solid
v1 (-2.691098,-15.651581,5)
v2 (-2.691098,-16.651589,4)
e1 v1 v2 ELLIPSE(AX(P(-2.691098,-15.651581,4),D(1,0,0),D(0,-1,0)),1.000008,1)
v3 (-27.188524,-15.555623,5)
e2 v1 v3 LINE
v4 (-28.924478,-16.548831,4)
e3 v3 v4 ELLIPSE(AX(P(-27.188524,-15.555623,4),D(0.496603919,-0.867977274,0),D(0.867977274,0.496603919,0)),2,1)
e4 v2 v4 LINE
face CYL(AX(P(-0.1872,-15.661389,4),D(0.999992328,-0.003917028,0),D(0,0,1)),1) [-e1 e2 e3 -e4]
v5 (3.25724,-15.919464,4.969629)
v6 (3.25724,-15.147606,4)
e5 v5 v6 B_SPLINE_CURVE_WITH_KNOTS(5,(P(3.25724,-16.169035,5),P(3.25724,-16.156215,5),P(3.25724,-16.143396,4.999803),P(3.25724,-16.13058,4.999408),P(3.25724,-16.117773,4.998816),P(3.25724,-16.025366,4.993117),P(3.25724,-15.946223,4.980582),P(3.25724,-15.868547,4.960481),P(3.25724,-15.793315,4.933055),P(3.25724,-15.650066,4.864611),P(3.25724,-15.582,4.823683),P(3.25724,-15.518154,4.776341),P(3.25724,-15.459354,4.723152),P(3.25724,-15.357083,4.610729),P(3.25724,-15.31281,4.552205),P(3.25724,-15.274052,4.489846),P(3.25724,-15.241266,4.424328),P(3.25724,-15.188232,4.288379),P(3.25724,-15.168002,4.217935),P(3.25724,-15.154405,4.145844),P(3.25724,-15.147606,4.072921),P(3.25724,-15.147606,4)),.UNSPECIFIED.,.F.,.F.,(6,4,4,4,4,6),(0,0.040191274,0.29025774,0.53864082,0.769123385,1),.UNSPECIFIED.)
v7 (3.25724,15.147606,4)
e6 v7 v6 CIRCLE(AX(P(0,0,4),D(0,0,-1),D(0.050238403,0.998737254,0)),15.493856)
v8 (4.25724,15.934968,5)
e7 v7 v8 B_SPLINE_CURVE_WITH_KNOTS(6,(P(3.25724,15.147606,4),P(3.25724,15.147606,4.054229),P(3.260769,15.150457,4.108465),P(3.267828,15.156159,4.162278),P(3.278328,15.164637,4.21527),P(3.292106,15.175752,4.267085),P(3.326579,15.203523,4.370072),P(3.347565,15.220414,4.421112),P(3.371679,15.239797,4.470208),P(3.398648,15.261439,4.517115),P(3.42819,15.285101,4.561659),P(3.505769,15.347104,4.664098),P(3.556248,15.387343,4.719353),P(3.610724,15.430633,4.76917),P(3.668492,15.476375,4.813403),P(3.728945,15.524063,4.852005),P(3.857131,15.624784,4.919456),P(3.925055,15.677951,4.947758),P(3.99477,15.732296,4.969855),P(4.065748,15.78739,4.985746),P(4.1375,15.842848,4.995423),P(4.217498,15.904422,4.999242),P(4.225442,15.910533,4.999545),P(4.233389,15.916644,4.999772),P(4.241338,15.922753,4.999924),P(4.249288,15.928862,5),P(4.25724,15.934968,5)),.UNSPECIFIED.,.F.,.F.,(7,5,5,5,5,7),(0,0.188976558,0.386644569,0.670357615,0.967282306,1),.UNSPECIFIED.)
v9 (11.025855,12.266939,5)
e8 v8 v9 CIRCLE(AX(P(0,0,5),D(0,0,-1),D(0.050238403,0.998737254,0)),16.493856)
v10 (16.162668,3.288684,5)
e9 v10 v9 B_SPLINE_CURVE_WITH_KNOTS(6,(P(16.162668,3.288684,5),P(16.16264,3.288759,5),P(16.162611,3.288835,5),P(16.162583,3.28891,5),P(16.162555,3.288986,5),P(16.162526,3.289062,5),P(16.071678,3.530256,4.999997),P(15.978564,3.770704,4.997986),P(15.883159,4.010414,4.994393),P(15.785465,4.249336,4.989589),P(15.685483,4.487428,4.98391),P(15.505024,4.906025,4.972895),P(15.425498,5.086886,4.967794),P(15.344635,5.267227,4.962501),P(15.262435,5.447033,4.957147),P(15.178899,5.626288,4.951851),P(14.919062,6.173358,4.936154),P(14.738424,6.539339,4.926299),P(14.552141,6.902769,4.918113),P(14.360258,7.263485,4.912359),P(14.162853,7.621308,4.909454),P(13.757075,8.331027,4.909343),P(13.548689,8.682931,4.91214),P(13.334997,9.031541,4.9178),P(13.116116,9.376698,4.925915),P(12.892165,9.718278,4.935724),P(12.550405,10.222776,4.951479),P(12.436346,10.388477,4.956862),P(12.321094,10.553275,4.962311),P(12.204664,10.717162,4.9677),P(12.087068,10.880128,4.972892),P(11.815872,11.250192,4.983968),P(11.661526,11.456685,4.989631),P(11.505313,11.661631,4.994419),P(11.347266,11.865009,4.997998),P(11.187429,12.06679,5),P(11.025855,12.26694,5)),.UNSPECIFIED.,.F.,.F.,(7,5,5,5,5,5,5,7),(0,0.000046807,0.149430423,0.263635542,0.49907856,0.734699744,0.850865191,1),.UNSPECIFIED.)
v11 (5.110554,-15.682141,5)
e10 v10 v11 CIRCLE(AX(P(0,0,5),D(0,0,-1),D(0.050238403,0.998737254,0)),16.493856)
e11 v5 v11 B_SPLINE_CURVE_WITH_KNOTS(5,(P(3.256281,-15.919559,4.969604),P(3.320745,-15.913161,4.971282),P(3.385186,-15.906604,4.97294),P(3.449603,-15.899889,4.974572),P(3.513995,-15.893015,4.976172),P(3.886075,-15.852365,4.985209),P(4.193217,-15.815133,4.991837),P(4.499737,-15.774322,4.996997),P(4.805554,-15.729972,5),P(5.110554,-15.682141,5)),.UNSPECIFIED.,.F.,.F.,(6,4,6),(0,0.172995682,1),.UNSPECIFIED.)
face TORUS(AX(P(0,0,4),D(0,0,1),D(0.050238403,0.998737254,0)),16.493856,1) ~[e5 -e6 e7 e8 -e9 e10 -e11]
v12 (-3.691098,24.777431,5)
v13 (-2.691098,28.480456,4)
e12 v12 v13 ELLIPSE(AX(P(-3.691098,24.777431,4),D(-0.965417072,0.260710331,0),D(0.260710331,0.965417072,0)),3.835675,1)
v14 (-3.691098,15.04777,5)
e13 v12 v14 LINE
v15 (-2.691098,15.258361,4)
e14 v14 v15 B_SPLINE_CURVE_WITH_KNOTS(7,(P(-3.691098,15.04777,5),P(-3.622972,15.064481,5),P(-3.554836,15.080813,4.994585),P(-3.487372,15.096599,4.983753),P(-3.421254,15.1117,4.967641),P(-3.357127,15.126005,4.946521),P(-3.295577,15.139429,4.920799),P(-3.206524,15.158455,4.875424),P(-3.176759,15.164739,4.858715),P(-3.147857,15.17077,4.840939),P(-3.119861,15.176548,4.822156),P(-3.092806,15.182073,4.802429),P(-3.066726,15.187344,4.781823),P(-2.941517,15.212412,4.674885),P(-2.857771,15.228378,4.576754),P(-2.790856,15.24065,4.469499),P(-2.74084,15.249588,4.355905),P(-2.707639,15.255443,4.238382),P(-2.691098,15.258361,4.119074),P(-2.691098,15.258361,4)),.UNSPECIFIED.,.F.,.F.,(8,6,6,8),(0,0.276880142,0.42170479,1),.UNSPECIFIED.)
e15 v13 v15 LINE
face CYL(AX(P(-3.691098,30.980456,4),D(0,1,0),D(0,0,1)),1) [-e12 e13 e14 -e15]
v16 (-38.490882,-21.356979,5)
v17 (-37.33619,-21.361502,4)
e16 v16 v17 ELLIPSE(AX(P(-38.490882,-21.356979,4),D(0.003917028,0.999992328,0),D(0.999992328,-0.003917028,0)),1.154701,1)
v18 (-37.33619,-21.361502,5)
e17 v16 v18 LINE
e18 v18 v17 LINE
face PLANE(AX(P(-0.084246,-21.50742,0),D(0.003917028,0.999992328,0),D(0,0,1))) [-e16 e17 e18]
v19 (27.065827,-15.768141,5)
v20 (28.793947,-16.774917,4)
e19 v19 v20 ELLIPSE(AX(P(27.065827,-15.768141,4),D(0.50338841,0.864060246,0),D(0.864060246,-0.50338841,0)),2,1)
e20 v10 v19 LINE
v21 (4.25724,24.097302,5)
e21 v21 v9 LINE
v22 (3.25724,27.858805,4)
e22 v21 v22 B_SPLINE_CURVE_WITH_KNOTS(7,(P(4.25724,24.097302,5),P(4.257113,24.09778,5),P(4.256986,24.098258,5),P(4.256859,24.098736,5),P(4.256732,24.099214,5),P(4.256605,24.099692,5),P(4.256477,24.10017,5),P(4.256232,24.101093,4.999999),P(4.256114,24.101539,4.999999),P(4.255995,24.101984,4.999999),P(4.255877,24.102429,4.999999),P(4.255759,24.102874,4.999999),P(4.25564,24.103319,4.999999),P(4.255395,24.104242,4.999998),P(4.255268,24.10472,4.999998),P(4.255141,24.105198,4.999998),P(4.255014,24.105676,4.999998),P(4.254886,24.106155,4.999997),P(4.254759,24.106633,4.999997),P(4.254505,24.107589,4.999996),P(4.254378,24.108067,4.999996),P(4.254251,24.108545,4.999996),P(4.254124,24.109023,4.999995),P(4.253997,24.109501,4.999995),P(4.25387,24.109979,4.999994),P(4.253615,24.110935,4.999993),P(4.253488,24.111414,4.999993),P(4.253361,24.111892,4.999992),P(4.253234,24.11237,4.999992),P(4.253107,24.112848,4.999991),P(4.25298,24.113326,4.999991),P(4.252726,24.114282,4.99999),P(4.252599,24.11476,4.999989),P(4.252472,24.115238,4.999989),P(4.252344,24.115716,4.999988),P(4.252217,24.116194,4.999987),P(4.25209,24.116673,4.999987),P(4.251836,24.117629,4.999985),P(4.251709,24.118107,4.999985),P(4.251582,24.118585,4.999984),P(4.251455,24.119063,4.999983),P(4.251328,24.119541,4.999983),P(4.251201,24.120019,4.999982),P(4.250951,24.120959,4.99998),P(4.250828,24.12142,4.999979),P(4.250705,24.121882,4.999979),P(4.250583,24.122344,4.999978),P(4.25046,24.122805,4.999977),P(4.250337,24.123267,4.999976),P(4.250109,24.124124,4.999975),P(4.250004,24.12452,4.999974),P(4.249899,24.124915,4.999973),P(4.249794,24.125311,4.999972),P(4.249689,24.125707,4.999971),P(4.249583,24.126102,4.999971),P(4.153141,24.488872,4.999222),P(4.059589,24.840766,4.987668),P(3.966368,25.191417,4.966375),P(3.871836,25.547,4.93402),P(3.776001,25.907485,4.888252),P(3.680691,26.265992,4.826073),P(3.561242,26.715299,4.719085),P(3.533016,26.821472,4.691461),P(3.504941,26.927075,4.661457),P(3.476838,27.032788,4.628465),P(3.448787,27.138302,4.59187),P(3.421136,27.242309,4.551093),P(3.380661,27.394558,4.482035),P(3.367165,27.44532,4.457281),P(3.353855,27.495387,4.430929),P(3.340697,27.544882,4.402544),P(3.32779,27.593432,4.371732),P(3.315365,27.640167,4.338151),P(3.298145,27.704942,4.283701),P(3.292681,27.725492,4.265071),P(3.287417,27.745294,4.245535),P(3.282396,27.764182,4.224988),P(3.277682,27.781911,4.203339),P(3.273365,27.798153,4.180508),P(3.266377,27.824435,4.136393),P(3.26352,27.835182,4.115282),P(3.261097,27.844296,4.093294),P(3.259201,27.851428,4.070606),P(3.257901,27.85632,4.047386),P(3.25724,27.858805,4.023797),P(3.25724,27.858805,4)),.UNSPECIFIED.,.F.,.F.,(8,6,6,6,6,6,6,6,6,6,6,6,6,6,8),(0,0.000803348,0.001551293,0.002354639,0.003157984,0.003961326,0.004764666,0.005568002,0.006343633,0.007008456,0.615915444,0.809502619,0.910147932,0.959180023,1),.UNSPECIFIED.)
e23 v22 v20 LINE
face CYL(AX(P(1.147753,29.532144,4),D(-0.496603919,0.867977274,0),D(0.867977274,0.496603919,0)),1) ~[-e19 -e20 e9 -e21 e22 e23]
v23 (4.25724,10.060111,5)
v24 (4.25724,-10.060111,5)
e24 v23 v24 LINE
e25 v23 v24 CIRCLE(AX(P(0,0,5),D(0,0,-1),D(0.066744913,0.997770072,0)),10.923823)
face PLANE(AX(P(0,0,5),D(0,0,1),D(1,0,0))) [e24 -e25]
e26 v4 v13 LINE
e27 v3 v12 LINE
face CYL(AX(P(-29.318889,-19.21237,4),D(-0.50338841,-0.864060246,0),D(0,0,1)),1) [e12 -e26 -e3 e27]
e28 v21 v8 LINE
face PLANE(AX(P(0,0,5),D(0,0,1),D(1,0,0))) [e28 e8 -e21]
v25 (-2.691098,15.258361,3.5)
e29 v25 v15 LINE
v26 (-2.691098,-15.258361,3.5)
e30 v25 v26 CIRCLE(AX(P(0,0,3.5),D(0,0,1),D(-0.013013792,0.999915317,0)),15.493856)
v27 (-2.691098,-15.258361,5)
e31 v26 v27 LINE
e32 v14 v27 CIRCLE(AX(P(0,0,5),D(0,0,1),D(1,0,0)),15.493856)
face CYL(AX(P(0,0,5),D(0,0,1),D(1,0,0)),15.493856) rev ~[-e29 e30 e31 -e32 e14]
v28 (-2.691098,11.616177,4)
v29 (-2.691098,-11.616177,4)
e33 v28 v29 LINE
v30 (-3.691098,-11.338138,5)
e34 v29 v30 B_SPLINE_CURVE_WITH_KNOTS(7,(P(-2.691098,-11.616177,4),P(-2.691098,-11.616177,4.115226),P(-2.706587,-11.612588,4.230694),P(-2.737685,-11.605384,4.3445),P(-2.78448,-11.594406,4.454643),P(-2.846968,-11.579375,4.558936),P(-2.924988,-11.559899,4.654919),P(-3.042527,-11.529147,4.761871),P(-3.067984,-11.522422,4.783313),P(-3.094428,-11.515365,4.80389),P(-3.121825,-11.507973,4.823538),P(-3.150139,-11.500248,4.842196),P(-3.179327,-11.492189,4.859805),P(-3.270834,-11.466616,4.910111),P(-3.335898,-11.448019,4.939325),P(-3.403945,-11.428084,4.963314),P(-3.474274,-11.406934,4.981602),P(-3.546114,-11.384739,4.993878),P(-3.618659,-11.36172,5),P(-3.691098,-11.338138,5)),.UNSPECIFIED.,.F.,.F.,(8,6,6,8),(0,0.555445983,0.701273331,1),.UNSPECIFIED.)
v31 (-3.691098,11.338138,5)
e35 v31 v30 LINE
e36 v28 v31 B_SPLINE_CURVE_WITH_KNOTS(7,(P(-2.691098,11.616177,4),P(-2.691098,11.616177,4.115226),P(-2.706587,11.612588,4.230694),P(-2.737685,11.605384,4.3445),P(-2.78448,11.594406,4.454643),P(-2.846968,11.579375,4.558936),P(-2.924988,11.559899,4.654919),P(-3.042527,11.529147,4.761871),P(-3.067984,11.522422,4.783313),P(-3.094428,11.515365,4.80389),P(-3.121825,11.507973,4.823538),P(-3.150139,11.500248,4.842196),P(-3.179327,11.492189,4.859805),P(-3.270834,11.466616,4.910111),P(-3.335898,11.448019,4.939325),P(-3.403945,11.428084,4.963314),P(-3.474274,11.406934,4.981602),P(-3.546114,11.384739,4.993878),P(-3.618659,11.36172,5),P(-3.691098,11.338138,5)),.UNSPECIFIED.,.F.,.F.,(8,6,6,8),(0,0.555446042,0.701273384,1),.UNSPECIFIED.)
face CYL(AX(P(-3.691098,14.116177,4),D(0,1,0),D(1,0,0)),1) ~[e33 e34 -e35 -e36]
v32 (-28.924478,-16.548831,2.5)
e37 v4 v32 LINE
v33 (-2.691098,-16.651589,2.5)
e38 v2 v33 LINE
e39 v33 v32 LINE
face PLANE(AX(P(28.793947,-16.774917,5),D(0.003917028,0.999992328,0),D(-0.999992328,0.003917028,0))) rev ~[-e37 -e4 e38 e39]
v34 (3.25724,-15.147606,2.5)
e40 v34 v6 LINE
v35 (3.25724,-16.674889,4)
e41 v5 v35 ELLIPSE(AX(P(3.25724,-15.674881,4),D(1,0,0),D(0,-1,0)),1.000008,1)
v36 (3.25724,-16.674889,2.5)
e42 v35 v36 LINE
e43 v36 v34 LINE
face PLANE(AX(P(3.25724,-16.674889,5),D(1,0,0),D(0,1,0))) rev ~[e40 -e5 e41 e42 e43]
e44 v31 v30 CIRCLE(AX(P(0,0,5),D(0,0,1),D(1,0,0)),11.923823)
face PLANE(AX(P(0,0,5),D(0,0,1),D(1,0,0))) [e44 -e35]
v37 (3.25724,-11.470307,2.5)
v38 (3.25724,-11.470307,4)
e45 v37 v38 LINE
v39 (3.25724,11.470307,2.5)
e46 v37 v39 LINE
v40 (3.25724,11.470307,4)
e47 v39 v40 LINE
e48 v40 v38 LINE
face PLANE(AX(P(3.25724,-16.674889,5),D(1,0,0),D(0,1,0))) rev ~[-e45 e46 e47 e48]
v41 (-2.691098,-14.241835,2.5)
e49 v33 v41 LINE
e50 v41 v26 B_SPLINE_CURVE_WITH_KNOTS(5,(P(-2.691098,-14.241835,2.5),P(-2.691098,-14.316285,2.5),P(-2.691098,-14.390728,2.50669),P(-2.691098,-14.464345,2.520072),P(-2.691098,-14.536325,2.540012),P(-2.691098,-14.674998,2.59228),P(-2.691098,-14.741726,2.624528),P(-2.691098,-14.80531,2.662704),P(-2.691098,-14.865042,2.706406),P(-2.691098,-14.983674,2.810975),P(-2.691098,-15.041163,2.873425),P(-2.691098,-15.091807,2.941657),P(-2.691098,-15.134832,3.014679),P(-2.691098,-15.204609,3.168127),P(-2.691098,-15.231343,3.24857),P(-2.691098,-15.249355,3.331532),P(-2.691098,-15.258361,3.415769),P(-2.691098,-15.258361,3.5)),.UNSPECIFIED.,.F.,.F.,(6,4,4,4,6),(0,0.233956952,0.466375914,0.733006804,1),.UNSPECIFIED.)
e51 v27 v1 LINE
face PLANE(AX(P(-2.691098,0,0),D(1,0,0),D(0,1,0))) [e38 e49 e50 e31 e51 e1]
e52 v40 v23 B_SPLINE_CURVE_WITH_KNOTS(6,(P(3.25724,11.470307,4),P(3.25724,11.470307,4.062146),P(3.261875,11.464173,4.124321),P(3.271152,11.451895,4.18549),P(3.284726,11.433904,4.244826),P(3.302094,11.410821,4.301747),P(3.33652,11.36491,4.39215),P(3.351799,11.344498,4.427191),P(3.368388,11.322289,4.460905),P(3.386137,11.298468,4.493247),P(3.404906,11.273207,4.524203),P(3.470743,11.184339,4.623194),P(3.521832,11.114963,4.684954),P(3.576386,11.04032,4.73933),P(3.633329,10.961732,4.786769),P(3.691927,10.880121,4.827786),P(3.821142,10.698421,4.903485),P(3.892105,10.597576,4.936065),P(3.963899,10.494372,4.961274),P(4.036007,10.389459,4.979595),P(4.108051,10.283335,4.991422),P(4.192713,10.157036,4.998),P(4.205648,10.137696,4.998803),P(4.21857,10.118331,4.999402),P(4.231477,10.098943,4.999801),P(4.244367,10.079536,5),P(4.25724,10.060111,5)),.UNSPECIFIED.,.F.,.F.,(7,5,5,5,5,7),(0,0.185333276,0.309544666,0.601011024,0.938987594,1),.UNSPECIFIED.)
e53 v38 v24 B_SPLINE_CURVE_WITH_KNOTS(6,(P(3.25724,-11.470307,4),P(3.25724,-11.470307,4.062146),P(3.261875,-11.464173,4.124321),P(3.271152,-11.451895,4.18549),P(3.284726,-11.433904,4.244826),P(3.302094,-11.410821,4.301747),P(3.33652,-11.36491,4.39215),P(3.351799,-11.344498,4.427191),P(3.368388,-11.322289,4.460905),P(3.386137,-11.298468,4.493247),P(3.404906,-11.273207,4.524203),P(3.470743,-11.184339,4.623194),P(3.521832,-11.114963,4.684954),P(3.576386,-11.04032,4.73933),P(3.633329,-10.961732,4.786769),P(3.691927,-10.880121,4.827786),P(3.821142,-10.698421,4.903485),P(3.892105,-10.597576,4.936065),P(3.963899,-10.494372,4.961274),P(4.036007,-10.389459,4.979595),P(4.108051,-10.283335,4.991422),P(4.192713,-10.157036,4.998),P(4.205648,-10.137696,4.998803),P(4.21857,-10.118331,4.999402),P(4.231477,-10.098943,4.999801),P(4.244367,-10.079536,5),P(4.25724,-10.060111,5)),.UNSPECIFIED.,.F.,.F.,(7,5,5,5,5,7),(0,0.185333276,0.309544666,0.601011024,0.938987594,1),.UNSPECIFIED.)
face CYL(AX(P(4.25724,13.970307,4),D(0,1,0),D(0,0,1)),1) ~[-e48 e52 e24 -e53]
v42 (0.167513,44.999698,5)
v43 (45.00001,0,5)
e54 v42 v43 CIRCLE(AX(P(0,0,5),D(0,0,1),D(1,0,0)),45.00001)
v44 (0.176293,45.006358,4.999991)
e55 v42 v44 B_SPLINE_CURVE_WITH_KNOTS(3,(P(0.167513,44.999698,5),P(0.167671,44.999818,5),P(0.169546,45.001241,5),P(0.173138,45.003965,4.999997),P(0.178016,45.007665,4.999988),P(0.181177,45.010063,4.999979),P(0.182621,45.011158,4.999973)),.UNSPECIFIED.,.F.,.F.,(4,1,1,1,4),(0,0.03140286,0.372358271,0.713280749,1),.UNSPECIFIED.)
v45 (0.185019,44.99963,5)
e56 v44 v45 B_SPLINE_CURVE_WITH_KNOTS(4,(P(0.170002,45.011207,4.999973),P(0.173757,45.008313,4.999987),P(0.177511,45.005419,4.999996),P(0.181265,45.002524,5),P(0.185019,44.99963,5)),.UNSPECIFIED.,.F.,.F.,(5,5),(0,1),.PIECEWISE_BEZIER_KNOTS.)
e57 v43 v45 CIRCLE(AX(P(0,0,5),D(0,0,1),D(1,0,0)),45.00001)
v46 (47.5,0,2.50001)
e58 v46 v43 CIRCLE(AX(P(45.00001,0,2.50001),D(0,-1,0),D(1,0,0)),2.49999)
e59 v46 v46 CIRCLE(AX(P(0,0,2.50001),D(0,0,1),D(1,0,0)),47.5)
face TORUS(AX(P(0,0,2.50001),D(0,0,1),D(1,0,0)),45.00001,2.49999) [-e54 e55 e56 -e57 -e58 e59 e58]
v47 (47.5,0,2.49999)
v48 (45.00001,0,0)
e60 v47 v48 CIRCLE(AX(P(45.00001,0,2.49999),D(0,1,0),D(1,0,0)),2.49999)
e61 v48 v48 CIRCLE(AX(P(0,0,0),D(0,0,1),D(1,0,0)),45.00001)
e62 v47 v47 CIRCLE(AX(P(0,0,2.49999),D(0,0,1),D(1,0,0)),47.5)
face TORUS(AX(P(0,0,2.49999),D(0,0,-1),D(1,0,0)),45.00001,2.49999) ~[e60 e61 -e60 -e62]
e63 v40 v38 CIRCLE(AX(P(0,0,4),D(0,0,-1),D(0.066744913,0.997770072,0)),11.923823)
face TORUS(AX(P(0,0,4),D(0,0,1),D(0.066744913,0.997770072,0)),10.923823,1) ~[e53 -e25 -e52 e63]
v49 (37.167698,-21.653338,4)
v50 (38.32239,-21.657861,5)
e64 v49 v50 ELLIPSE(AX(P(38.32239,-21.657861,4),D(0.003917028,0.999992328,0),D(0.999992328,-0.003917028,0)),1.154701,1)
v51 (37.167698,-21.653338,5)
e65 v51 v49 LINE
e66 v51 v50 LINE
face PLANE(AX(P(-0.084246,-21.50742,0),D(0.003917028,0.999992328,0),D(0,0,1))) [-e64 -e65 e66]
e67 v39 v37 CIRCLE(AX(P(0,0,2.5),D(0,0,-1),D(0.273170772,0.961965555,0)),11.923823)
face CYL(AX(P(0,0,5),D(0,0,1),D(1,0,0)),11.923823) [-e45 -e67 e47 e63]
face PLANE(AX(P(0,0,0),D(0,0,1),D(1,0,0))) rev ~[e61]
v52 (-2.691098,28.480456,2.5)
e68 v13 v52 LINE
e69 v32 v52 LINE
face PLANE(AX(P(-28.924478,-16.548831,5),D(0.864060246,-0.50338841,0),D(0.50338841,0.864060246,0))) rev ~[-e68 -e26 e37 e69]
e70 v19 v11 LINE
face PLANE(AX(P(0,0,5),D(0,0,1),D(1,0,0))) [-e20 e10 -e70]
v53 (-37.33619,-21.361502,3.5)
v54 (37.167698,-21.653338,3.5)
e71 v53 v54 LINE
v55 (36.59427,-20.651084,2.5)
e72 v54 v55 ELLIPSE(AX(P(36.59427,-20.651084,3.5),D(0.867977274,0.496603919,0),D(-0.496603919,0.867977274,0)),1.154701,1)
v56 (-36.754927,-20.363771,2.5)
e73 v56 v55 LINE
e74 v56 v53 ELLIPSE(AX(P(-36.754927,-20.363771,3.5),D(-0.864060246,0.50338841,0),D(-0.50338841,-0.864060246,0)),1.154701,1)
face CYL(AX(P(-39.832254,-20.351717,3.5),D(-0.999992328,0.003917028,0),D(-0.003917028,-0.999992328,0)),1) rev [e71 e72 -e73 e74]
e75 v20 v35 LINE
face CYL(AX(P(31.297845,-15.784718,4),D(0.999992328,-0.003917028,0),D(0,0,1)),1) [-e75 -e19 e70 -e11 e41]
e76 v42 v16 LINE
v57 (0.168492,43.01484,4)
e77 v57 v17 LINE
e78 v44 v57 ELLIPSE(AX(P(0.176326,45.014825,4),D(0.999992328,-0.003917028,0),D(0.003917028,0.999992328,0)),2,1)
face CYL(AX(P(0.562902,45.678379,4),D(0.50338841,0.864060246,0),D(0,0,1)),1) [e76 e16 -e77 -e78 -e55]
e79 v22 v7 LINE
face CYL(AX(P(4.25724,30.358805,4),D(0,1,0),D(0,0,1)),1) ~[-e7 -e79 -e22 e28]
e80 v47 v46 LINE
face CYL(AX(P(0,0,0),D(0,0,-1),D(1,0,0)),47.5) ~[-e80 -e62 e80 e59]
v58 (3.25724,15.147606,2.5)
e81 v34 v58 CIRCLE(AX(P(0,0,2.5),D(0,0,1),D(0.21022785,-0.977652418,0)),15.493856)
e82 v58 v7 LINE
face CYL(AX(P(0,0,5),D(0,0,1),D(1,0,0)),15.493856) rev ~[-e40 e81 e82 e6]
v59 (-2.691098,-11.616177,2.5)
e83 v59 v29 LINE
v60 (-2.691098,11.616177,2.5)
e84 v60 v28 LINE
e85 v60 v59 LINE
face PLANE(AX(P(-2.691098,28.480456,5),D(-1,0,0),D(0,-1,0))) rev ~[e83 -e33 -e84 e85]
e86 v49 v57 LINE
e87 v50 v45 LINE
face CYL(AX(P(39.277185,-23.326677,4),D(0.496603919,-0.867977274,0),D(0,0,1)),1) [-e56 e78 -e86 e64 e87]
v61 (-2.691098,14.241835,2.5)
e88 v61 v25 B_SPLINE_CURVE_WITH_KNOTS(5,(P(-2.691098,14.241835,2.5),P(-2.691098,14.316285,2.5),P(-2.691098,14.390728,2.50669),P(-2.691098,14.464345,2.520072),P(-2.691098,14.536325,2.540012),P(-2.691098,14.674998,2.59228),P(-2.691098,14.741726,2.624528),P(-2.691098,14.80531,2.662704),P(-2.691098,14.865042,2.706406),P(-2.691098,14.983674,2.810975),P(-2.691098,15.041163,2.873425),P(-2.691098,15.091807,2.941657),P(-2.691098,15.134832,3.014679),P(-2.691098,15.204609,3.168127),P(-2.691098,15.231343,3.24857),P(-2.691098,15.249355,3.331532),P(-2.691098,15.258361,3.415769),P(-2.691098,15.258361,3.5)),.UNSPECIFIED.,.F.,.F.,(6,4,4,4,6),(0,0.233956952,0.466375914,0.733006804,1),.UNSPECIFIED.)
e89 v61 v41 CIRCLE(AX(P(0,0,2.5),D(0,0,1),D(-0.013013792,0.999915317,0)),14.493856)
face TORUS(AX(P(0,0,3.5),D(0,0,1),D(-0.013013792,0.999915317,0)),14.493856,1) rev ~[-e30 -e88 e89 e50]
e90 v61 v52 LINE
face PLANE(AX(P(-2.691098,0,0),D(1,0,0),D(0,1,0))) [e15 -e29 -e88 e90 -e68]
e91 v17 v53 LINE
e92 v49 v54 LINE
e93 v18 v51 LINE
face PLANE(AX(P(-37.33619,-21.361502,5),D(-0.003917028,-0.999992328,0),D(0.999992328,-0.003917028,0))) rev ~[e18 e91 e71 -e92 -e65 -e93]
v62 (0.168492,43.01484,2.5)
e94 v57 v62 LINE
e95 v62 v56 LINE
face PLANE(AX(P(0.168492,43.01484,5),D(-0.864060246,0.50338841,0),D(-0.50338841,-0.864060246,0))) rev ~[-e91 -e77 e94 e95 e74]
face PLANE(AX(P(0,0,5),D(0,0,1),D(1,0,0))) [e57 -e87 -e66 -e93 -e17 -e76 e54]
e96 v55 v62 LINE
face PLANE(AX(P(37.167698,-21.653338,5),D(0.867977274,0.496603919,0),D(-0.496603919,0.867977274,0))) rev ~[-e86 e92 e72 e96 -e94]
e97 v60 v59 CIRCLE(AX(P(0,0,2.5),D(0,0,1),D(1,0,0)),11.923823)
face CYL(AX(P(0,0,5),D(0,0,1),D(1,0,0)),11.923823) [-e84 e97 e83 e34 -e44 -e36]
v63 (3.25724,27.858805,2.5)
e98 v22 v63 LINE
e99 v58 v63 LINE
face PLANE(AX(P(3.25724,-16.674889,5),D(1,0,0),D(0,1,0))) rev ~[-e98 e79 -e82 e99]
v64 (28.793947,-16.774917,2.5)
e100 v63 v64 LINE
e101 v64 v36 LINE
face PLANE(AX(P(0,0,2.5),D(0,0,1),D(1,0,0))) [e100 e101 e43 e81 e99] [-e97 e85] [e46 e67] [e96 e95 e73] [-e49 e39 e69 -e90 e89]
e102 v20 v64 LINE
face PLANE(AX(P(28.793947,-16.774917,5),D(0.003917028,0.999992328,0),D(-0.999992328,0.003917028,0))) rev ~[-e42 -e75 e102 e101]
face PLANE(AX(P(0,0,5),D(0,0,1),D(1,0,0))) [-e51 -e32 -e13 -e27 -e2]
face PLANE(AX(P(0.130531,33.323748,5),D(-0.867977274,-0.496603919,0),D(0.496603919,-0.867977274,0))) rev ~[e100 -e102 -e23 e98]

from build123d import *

# Parameters (mm, degrees)
F0_R         = 47.5
F1_DEPTH     = 5
F3_DEPTH     = 2.5
F4_R         = 15.4938561144
F4_R_2       = 11.9238234347
F5_DEPTH     = 2.5
F7_DEPTH     = 2.5
F8_R         = 2.49999
F9_T1_DEPTH  = 79.5044599257
F9_T6_ANGLE  = 178.5086872517
F9_T8_DEPTH  = 27.9406148573
F9_T10_DEPTH = 28.2323532374
F9_T12_DEPTH = 17.7111990238
F9_T14_DEPTH = 18.2220956401
F9_T16_DEPTH = 31.2335819135
F9_T18_DEPTH = 30.5369030224
F9_T20_DEPTH = 56.4226854656
F9_T22_DEPTH = 57.113596888
F9_T25_ANGLE = 172.3459061433
F9_T27_ANGLE = 174.2406786555
F9_T31_DEPTH = 79.5044599257
F9_T37_DEPTH = 79.5044599257
F9_T44_DEPTH = 79.5044599257
F9_T48_DEPTH = 79.5044599257


# Not quite as in the source:
# - a fillet or chamfer that OpenCascade refuses, or shapes differently, is made with other operations: its cross-section is extruded or revolved along the edge and cut away or added
# - a fillet or chamfer is up to 0.001 mm smaller than in the source, because OpenCascade refuses the exact size


with BuildPart() as f1:
    # F0 (on Top) → F1 (new body)
    with BuildSketch(Plane.XY):
        Circle(F0_R)
    extrude(amount=F1_DEPTH)

    # F2 (on face) → F3 (cut)
    with BuildSketch(Plane.XY.offset(5)):
        Polygon((-37.336189985, -21.3615019839), (37.1676983736, -21.6533380156), (0.1684916114, 43.0148399995), align=None)
        Polygon((-28.924478218, -16.5488310158), (0.1305310463, 33.3237484359), (28.7939471716, -16.77491742), align=None, mode=Mode.SUBTRACT)
    extrude(amount=-F3_DEPTH, mode=Mode.SUBTRACT)

    # F4 (on face) → F5 (cut)
    with BuildSketch(Plane.XY.offset(5)):
        Circle(F4_R)
        Circle(F4_R_2, mode=Mode.SUBTRACT)
    extrude(amount=-F5_DEPTH, mode=Mode.SUBTRACT)

    # F6 (on face) → F7 (cut)
    with BuildSketch(Plane.XY.offset(5)):
        with BuildLine():
            Line((3.2572400577, 27.8588049238), (0.1305310463, 33.3237484359))
            Line((0.1305310463, 33.3237484359), (-2.6910975575, 28.4804563395))
            Line((-2.6910975575, 28.4804563395), (-2.6910975575, 15.2583606993))
            ThreePointArc((-2.6910975575, 15.2583606993), (0.2884371491, 15.491171076), (3.2572400577, 15.1476059))
            Line((3.2572400577, 15.1476059), (3.2572400577, 27.8588049238))
        make_face()
        with BuildLine():
            ThreePointArc((3.2572400577, 15.1476059), (0.2884371491, 15.491171076), (-2.6910975575, 15.2583606993))
            Line((-2.6910975575, 15.2583606993), (-2.6910975575, -15.2583606993))
            ThreePointArc((-2.6910975575, -15.2583606993), (0.2884371491, -15.491171076), (3.2572400577, -15.1476059))
            Line((3.2572400577, -15.1476059), (3.2572400577, 15.1476059))
        make_face()
        with BuildLine():
            ThreePointArc((3.2572400577, -15.1476059), (0.2884371491, -15.491171076), (-2.6910975575, -15.2583606993))
            Line((-2.6910975575, -15.2583606993), (-2.6910975575, -16.6515886823))
            Line((-2.6910975575, -16.6515886823), (3.2572400577, -16.6748886641))
            Line((3.2572400577, -16.6748886641), (3.2572400577, -15.1476059))
        make_face()
    extrude(amount=-F7_DEPTH, mode=Mode.SUBTRACT)

    # F8 (radius 2.5 in the source; OpenCascade refuses exactly that, so slightly less here)
    f8_edges = [f1.edges().sort_by_distance(p)[0] for p in [
        (-47.5, 0, 5),
        (-47.5, 0, 0),
    ]]
    fillet(f8_edges, radius=F8_R)

    # F9: fillet of radius 1 on 14 edges, made by hand

    # F9_s2 → F9_t1 (join)
    with BuildSketch(Plane(origin=(-39.7519250003, 0.155710585, 0), x_dir=(0, 0, 1), z_dir=(0.9999923284, -0.0039170277, 0))):
        with BuildLine():
            ThreePointArc((3.5, 21.507584997), (2.7928932188, 21.2146917781), (2.5, 20.507584997))
            Line((2.5, 20.507584997), (2.5, 21.507584997))
            Line((2.5, 21.507584997), (3.5, 21.507584997))
        make_face()
    extrude(amount=F9_T1_DEPTH)


with BuildPart() as f9_tool4:
    # F9_s5 → F9_t6 (revolve)
    with BuildSketch(Plane(origin=(0, 0, 0), x_dir=(0, 0, 1), z_dir=(0.999915317, 0.0130137915, 0))):
        with BuildLine():
            ThreePointArc((2.5, -14.4938561144), (2.7928932188, -15.2009628956), (3.5, -15.4938561144))
            Line((3.5, -15.4938561144), (2.5, -15.4938561144))
            Line((2.5, -15.4938561144), (2.5, -14.4938561144))
        make_face()
    revolve(axis=Axis((0, 0, 2.5), (0, 0, 1)), revolution_arc=F9_T6_ANGLE)

    split(bisect_by=Plane.YZ.offset(-2.6910975575), keep=Keep.BOTTOM)


with BuildPart() as f1_1:
    add(f1.part)

    # F9_t3: union F9_tool4
    add(f9_tool4.part)

    # F9_s9 → F9_t8 (cut)
    with BuildSketch(Plane.XZ.offset(-13.9703074287)):
        with BuildLine():
            ThreePointArc((4.2572400577, 5), (3.5501332765, 4.7071067812), (3.2572400577, 4))
            Line((3.2572400577, 4), (3.2572400577, 5))
            Line((3.2572400577, 5), (4.2572400577, 5))
        make_face()
    extrude(amount=F9_T8_DEPTH, mode=Mode.SUBTRACT)

    # F9_s11 → F9_t10 (cut)
    with BuildSketch(Plane.XZ.offset(-14.1161766187)):
        with BuildLine():
            ThreePointArc((-2.6910975575, 4), (-2.9839907764, 4.7071067812), (-3.6910975575, 5))
            Line((-3.6910975575, 5), (-2.6910975575, 5))
            Line((-2.6910975575, 5), (-2.6910975575, 4))
        make_face()
    extrude(amount=F9_T10_DEPTH, mode=Mode.SUBTRACT)

    # F9_s13 → F9_t12 (cut)
    with BuildSketch(Plane.XZ.offset(-30.3588049238)):
        with BuildLine():
            ThreePointArc((4.2572400577, 5), (3.5501332765, 4.7071067812), (3.2572400577, 4))
            Line((3.2572400577, 4), (3.2572400577, 5))
            Line((3.2572400577, 5), (4.2572400577, 5))
        make_face()
    extrude(amount=F9_T12_DEPTH, mode=Mode.SUBTRACT)

    # F9_s15 → F9_t14 (cut)
    with BuildSketch(Plane.XZ.offset(-30.9804563395)):
        with BuildLine():
            ThreePointArc((-3.6910975575, 5), (-2.9839907764, 4.7071067812), (-2.6910975575, 4))
            Line((-2.6910975575, 4), (-2.6910975575, 5))
            Line((-2.6910975575, 5), (-3.6910975575, 5))
        make_face()
    extrude(amount=F9_T14_DEPTH, mode=Mode.SUBTRACT)

    # F9_s17 → F9_t16 (cut)
    with BuildSketch(Plane(origin=(-0.1258512133, 0.0004929665, 0), x_dir=(0, 0, 1), z_dir=(-0.9999923284, 0.0039170277, 0))):
        with BuildLine():
            ThreePointArc((5, -15.6620020419), (4.7071067812, -16.369108823), (4, -16.6620020419))
            Line((4, -16.6620020419), (5, -16.6620020419))
            Line((5, -16.6620020419), (5, -15.6620020419))
        make_face()
    extrude(amount=F9_T16_DEPTH, mode=Mode.SUBTRACT)

    # F9_s19 → F9_t18 (cut)
    with BuildSketch(Plane(origin=(31.3591935158, -0.1228357713, 0), x_dir=(0, 0, 1), z_dir=(-0.9999923284, 0.0039170277, 0))):
        with BuildLine():
            ThreePointArc((5, -15.6620020419), (4.7071067812, -16.369108823), (4, -16.6620020419))
            Line((4, -16.6620020419), (5, -16.6620020419))
            Line((5, -16.6620020419), (5, -15.6620020419))
        make_face()
    extrude(amount=F9_T18_DEPTH, mode=Mode.SUBTRACT)

    # F9_s21 → F9_t20 (cut)
    with BuildSketch(Plane(origin=(-12.4465088481, 21.7543326005, 0), x_dir=(0, 0, 1), z_dir=(0.4966039187, -0.8679772738, 0))):
        with BuildLine():
            ThreePointArc((4, -16.6620020419), (4.7071067812, -16.369108823), (5, -15.6620020419))
            Line((5, -15.6620020419), (5, -16.6620020419))
            Line((5, -16.6620020419), (4, -16.6620020419))
        make_face()
    extrude(amount=F9_T20_DEPTH, mode=Mode.SUBTRACT)

    # F9_s23 → F9_t22 (cut)
    with BuildSketch(Plane(origin=(-15.7859756564, -27.0964403413, 0), x_dir=(0, 0, 1), z_dir=(0.5033884097, 0.8640602462, 0))):
        with BuildLine():
            ThreePointArc((5, -15.6620020419), (4.7071067812, -16.369108823), (4, -16.6620020419))
            Line((4, -16.6620020419), (5, -16.6620020419))
            Line((5, -16.6620020419), (5, -15.6620020419))
        make_face()
    extrude(amount=F9_T22_DEPTH, mode=Mode.SUBTRACT)

    # F9_s24 → F9_t25 (revolve, cut)
    with BuildSketch(Plane(origin=(0, 0, 0), x_dir=(0, 0, 1), z_dir=(-0.997770072, 0.0667449131, 0))):
        with BuildLine():
            ThreePointArc((4, 11.9238234347), (4.7071067812, 11.6309302159), (5, 10.9238234347))
            Line((5, 10.9238234347), (5, 11.9238234347))
            Line((5, 11.9238234347), (4, 11.9238234347))
        make_face()
    revolve(axis=Axis((0, 0, 5), (0, 0, -1)), revolution_arc=F9_T25_ANGLE, mode=Mode.SUBTRACT)

    # F9_s26 → F9_t27 (revolve, cut)
    with BuildSketch(Plane(origin=(0, 0, 0), x_dir=(0, 0, 1), z_dir=(-0.9987372542, 0.0502384033, 0))):
        with BuildLine():
            ThreePointArc((5, 16.4938561144), (4.7071067812, 15.7867493333), (4, 15.4938561144))
            Line((4, 15.4938561144), (5, 15.4938561144))
            Line((5, 15.4938561144), (5, 16.4938561144))
        make_face()
    revolve(axis=Axis((0, 0, 5), (0, 0, -1)), revolution_arc=F9_T27_ANGLE, mode=Mode.SUBTRACT)


with BuildPart() as f9_tool29:
    # F9_s30 → F9_t31 (new body)
    with BuildSketch(Plane(origin=(20.0108118224, 34.3483216071, 0), x_dir=(0, 0, 1), z_dir=(-0.5033884097, -0.8640602462, 0))):
        with BuildLine():
            ThreePointArc((5, 22.507584997), (4.7071067812, 21.8004782158), (4, 21.507584997))
            Line((4, 21.507584997), (5, 21.507584997))
            Line((5, 21.507584997), (5, 22.507584997))
        make_face()
    extrude(amount=F9_T31_DEPTH)

    split(bisect_by=Plane(origin=(18.6680949925, 10.680750992, 0), x_dir=(0, 0, 1), z_dir=(-0.8679772738, -0.4966039187, 0)), keep=Keep.TOP)

    split(bisect_by=Plane(origin=(-0.0842458057, -21.5074199997, 0), x_dir=(0, 0, 1), z_dir=(0.0039170277, 0.9999923284, 0)), keep=Keep.TOP)


with BuildPart() as f1_2:
    add(f1_1.part)

    # F9_t28: cut F9_tool29
    add(f9_tool29.part, mode=Mode.SUBTRACT)


with BuildPart() as f9_tool35:
    # F9_s36 → F9_t37 (new body)
    with BuildSketch(Plane(origin=(19.7411131779, -34.5040321921, 0), x_dir=(0, 0, 1), z_dir=(-0.4966039187, 0.8679772738, 0))):
        with BuildLine():
            ThreePointArc((5, 22.507584997), (4.7071067812, 21.8004782158), (4, 21.507584997))
            Line((4, 21.507584997), (5, 21.507584997))
            Line((5, 21.507584997), (5, 22.507584997))
        make_face()
    extrude(amount=F9_T37_DEPTH)

    split(bisect_by=Plane(origin=(-18.5838491868, 10.8266690078, 0), x_dir=(0, 0, 1), z_dir=(0.8640602462, -0.5033884097, 0)), keep=Keep.TOP)

    split(bisect_by=Plane(origin=(-0.0842458057, -21.5074199997, 0), x_dir=(0, 0, 1), z_dir=(0.0039170277, 0.9999923284, 0)), keep=Keep.TOP)


with BuildPart() as f1_3:
    add(f1_2.part)

    # F9_t34: cut F9_tool35
    add(f9_tool35.part, mode=Mode.SUBTRACT)


with BuildPart() as f9_tool42:
    # F9_s43 → F9_t44 (new body)
    with BuildSketch(Plane(origin=(20.0108118224, 34.3483216071, 0), x_dir=(0, 0, 1), z_dir=(-0.5033884097, -0.8640602462, 0))):
        with BuildLine():
            ThreePointArc((5, 22.507584997), (4.7071067812, 21.8004782158), (4, 21.507584997))
            Line((4, 21.507584997), (5, 21.507584997))
            Line((5, 21.507584997), (5, 22.507584997))
        make_face()
    extrude(amount=F9_T44_DEPTH)

    split(bisect_by=Plane(origin=(18.6680949925, 10.680750992, 0), x_dir=(0, 0, 1), z_dir=(0.8679772738, 0.4966039187, 0)), keep=Keep.TOP)


with BuildPart() as f9_tool46:
    # F9_s47 → F9_t48 (new body)
    with BuildSketch(Plane(origin=(19.7411131779, -34.5040321921, 0), x_dir=(0, 0, 1), z_dir=(-0.4966039187, 0.8679772738, 0))):
        with BuildLine():
            ThreePointArc((5, 22.507584997), (4.7071067812, 21.8004782158), (4, 21.507584997))
            Line((4, 21.507584997), (5, 21.507584997))
            Line((5, 21.507584997), (5, 22.507584997))
        make_face()
    extrude(amount=F9_T48_DEPTH)

    split(bisect_by=Plane(origin=(-18.5838491868, 10.8266690078, 0), x_dir=(0, 0, 1), z_dir=(-0.8640602462, 0.5033884097, 0)), keep=Keep.TOP)


with BuildPart() as f9_tool42_1:
    add(f9_tool42.part)

    # F9_t50: intersect F9_tool46
    add(f9_tool46.part, mode=Mode.INTERSECT)


with BuildPart() as f1_4:
    add(f1_3.part)

    # F9_t40: cut F9_tool42
    add(f9_tool42_1.part, mode=Mode.SUBTRACT)


solid = f1_4.part
